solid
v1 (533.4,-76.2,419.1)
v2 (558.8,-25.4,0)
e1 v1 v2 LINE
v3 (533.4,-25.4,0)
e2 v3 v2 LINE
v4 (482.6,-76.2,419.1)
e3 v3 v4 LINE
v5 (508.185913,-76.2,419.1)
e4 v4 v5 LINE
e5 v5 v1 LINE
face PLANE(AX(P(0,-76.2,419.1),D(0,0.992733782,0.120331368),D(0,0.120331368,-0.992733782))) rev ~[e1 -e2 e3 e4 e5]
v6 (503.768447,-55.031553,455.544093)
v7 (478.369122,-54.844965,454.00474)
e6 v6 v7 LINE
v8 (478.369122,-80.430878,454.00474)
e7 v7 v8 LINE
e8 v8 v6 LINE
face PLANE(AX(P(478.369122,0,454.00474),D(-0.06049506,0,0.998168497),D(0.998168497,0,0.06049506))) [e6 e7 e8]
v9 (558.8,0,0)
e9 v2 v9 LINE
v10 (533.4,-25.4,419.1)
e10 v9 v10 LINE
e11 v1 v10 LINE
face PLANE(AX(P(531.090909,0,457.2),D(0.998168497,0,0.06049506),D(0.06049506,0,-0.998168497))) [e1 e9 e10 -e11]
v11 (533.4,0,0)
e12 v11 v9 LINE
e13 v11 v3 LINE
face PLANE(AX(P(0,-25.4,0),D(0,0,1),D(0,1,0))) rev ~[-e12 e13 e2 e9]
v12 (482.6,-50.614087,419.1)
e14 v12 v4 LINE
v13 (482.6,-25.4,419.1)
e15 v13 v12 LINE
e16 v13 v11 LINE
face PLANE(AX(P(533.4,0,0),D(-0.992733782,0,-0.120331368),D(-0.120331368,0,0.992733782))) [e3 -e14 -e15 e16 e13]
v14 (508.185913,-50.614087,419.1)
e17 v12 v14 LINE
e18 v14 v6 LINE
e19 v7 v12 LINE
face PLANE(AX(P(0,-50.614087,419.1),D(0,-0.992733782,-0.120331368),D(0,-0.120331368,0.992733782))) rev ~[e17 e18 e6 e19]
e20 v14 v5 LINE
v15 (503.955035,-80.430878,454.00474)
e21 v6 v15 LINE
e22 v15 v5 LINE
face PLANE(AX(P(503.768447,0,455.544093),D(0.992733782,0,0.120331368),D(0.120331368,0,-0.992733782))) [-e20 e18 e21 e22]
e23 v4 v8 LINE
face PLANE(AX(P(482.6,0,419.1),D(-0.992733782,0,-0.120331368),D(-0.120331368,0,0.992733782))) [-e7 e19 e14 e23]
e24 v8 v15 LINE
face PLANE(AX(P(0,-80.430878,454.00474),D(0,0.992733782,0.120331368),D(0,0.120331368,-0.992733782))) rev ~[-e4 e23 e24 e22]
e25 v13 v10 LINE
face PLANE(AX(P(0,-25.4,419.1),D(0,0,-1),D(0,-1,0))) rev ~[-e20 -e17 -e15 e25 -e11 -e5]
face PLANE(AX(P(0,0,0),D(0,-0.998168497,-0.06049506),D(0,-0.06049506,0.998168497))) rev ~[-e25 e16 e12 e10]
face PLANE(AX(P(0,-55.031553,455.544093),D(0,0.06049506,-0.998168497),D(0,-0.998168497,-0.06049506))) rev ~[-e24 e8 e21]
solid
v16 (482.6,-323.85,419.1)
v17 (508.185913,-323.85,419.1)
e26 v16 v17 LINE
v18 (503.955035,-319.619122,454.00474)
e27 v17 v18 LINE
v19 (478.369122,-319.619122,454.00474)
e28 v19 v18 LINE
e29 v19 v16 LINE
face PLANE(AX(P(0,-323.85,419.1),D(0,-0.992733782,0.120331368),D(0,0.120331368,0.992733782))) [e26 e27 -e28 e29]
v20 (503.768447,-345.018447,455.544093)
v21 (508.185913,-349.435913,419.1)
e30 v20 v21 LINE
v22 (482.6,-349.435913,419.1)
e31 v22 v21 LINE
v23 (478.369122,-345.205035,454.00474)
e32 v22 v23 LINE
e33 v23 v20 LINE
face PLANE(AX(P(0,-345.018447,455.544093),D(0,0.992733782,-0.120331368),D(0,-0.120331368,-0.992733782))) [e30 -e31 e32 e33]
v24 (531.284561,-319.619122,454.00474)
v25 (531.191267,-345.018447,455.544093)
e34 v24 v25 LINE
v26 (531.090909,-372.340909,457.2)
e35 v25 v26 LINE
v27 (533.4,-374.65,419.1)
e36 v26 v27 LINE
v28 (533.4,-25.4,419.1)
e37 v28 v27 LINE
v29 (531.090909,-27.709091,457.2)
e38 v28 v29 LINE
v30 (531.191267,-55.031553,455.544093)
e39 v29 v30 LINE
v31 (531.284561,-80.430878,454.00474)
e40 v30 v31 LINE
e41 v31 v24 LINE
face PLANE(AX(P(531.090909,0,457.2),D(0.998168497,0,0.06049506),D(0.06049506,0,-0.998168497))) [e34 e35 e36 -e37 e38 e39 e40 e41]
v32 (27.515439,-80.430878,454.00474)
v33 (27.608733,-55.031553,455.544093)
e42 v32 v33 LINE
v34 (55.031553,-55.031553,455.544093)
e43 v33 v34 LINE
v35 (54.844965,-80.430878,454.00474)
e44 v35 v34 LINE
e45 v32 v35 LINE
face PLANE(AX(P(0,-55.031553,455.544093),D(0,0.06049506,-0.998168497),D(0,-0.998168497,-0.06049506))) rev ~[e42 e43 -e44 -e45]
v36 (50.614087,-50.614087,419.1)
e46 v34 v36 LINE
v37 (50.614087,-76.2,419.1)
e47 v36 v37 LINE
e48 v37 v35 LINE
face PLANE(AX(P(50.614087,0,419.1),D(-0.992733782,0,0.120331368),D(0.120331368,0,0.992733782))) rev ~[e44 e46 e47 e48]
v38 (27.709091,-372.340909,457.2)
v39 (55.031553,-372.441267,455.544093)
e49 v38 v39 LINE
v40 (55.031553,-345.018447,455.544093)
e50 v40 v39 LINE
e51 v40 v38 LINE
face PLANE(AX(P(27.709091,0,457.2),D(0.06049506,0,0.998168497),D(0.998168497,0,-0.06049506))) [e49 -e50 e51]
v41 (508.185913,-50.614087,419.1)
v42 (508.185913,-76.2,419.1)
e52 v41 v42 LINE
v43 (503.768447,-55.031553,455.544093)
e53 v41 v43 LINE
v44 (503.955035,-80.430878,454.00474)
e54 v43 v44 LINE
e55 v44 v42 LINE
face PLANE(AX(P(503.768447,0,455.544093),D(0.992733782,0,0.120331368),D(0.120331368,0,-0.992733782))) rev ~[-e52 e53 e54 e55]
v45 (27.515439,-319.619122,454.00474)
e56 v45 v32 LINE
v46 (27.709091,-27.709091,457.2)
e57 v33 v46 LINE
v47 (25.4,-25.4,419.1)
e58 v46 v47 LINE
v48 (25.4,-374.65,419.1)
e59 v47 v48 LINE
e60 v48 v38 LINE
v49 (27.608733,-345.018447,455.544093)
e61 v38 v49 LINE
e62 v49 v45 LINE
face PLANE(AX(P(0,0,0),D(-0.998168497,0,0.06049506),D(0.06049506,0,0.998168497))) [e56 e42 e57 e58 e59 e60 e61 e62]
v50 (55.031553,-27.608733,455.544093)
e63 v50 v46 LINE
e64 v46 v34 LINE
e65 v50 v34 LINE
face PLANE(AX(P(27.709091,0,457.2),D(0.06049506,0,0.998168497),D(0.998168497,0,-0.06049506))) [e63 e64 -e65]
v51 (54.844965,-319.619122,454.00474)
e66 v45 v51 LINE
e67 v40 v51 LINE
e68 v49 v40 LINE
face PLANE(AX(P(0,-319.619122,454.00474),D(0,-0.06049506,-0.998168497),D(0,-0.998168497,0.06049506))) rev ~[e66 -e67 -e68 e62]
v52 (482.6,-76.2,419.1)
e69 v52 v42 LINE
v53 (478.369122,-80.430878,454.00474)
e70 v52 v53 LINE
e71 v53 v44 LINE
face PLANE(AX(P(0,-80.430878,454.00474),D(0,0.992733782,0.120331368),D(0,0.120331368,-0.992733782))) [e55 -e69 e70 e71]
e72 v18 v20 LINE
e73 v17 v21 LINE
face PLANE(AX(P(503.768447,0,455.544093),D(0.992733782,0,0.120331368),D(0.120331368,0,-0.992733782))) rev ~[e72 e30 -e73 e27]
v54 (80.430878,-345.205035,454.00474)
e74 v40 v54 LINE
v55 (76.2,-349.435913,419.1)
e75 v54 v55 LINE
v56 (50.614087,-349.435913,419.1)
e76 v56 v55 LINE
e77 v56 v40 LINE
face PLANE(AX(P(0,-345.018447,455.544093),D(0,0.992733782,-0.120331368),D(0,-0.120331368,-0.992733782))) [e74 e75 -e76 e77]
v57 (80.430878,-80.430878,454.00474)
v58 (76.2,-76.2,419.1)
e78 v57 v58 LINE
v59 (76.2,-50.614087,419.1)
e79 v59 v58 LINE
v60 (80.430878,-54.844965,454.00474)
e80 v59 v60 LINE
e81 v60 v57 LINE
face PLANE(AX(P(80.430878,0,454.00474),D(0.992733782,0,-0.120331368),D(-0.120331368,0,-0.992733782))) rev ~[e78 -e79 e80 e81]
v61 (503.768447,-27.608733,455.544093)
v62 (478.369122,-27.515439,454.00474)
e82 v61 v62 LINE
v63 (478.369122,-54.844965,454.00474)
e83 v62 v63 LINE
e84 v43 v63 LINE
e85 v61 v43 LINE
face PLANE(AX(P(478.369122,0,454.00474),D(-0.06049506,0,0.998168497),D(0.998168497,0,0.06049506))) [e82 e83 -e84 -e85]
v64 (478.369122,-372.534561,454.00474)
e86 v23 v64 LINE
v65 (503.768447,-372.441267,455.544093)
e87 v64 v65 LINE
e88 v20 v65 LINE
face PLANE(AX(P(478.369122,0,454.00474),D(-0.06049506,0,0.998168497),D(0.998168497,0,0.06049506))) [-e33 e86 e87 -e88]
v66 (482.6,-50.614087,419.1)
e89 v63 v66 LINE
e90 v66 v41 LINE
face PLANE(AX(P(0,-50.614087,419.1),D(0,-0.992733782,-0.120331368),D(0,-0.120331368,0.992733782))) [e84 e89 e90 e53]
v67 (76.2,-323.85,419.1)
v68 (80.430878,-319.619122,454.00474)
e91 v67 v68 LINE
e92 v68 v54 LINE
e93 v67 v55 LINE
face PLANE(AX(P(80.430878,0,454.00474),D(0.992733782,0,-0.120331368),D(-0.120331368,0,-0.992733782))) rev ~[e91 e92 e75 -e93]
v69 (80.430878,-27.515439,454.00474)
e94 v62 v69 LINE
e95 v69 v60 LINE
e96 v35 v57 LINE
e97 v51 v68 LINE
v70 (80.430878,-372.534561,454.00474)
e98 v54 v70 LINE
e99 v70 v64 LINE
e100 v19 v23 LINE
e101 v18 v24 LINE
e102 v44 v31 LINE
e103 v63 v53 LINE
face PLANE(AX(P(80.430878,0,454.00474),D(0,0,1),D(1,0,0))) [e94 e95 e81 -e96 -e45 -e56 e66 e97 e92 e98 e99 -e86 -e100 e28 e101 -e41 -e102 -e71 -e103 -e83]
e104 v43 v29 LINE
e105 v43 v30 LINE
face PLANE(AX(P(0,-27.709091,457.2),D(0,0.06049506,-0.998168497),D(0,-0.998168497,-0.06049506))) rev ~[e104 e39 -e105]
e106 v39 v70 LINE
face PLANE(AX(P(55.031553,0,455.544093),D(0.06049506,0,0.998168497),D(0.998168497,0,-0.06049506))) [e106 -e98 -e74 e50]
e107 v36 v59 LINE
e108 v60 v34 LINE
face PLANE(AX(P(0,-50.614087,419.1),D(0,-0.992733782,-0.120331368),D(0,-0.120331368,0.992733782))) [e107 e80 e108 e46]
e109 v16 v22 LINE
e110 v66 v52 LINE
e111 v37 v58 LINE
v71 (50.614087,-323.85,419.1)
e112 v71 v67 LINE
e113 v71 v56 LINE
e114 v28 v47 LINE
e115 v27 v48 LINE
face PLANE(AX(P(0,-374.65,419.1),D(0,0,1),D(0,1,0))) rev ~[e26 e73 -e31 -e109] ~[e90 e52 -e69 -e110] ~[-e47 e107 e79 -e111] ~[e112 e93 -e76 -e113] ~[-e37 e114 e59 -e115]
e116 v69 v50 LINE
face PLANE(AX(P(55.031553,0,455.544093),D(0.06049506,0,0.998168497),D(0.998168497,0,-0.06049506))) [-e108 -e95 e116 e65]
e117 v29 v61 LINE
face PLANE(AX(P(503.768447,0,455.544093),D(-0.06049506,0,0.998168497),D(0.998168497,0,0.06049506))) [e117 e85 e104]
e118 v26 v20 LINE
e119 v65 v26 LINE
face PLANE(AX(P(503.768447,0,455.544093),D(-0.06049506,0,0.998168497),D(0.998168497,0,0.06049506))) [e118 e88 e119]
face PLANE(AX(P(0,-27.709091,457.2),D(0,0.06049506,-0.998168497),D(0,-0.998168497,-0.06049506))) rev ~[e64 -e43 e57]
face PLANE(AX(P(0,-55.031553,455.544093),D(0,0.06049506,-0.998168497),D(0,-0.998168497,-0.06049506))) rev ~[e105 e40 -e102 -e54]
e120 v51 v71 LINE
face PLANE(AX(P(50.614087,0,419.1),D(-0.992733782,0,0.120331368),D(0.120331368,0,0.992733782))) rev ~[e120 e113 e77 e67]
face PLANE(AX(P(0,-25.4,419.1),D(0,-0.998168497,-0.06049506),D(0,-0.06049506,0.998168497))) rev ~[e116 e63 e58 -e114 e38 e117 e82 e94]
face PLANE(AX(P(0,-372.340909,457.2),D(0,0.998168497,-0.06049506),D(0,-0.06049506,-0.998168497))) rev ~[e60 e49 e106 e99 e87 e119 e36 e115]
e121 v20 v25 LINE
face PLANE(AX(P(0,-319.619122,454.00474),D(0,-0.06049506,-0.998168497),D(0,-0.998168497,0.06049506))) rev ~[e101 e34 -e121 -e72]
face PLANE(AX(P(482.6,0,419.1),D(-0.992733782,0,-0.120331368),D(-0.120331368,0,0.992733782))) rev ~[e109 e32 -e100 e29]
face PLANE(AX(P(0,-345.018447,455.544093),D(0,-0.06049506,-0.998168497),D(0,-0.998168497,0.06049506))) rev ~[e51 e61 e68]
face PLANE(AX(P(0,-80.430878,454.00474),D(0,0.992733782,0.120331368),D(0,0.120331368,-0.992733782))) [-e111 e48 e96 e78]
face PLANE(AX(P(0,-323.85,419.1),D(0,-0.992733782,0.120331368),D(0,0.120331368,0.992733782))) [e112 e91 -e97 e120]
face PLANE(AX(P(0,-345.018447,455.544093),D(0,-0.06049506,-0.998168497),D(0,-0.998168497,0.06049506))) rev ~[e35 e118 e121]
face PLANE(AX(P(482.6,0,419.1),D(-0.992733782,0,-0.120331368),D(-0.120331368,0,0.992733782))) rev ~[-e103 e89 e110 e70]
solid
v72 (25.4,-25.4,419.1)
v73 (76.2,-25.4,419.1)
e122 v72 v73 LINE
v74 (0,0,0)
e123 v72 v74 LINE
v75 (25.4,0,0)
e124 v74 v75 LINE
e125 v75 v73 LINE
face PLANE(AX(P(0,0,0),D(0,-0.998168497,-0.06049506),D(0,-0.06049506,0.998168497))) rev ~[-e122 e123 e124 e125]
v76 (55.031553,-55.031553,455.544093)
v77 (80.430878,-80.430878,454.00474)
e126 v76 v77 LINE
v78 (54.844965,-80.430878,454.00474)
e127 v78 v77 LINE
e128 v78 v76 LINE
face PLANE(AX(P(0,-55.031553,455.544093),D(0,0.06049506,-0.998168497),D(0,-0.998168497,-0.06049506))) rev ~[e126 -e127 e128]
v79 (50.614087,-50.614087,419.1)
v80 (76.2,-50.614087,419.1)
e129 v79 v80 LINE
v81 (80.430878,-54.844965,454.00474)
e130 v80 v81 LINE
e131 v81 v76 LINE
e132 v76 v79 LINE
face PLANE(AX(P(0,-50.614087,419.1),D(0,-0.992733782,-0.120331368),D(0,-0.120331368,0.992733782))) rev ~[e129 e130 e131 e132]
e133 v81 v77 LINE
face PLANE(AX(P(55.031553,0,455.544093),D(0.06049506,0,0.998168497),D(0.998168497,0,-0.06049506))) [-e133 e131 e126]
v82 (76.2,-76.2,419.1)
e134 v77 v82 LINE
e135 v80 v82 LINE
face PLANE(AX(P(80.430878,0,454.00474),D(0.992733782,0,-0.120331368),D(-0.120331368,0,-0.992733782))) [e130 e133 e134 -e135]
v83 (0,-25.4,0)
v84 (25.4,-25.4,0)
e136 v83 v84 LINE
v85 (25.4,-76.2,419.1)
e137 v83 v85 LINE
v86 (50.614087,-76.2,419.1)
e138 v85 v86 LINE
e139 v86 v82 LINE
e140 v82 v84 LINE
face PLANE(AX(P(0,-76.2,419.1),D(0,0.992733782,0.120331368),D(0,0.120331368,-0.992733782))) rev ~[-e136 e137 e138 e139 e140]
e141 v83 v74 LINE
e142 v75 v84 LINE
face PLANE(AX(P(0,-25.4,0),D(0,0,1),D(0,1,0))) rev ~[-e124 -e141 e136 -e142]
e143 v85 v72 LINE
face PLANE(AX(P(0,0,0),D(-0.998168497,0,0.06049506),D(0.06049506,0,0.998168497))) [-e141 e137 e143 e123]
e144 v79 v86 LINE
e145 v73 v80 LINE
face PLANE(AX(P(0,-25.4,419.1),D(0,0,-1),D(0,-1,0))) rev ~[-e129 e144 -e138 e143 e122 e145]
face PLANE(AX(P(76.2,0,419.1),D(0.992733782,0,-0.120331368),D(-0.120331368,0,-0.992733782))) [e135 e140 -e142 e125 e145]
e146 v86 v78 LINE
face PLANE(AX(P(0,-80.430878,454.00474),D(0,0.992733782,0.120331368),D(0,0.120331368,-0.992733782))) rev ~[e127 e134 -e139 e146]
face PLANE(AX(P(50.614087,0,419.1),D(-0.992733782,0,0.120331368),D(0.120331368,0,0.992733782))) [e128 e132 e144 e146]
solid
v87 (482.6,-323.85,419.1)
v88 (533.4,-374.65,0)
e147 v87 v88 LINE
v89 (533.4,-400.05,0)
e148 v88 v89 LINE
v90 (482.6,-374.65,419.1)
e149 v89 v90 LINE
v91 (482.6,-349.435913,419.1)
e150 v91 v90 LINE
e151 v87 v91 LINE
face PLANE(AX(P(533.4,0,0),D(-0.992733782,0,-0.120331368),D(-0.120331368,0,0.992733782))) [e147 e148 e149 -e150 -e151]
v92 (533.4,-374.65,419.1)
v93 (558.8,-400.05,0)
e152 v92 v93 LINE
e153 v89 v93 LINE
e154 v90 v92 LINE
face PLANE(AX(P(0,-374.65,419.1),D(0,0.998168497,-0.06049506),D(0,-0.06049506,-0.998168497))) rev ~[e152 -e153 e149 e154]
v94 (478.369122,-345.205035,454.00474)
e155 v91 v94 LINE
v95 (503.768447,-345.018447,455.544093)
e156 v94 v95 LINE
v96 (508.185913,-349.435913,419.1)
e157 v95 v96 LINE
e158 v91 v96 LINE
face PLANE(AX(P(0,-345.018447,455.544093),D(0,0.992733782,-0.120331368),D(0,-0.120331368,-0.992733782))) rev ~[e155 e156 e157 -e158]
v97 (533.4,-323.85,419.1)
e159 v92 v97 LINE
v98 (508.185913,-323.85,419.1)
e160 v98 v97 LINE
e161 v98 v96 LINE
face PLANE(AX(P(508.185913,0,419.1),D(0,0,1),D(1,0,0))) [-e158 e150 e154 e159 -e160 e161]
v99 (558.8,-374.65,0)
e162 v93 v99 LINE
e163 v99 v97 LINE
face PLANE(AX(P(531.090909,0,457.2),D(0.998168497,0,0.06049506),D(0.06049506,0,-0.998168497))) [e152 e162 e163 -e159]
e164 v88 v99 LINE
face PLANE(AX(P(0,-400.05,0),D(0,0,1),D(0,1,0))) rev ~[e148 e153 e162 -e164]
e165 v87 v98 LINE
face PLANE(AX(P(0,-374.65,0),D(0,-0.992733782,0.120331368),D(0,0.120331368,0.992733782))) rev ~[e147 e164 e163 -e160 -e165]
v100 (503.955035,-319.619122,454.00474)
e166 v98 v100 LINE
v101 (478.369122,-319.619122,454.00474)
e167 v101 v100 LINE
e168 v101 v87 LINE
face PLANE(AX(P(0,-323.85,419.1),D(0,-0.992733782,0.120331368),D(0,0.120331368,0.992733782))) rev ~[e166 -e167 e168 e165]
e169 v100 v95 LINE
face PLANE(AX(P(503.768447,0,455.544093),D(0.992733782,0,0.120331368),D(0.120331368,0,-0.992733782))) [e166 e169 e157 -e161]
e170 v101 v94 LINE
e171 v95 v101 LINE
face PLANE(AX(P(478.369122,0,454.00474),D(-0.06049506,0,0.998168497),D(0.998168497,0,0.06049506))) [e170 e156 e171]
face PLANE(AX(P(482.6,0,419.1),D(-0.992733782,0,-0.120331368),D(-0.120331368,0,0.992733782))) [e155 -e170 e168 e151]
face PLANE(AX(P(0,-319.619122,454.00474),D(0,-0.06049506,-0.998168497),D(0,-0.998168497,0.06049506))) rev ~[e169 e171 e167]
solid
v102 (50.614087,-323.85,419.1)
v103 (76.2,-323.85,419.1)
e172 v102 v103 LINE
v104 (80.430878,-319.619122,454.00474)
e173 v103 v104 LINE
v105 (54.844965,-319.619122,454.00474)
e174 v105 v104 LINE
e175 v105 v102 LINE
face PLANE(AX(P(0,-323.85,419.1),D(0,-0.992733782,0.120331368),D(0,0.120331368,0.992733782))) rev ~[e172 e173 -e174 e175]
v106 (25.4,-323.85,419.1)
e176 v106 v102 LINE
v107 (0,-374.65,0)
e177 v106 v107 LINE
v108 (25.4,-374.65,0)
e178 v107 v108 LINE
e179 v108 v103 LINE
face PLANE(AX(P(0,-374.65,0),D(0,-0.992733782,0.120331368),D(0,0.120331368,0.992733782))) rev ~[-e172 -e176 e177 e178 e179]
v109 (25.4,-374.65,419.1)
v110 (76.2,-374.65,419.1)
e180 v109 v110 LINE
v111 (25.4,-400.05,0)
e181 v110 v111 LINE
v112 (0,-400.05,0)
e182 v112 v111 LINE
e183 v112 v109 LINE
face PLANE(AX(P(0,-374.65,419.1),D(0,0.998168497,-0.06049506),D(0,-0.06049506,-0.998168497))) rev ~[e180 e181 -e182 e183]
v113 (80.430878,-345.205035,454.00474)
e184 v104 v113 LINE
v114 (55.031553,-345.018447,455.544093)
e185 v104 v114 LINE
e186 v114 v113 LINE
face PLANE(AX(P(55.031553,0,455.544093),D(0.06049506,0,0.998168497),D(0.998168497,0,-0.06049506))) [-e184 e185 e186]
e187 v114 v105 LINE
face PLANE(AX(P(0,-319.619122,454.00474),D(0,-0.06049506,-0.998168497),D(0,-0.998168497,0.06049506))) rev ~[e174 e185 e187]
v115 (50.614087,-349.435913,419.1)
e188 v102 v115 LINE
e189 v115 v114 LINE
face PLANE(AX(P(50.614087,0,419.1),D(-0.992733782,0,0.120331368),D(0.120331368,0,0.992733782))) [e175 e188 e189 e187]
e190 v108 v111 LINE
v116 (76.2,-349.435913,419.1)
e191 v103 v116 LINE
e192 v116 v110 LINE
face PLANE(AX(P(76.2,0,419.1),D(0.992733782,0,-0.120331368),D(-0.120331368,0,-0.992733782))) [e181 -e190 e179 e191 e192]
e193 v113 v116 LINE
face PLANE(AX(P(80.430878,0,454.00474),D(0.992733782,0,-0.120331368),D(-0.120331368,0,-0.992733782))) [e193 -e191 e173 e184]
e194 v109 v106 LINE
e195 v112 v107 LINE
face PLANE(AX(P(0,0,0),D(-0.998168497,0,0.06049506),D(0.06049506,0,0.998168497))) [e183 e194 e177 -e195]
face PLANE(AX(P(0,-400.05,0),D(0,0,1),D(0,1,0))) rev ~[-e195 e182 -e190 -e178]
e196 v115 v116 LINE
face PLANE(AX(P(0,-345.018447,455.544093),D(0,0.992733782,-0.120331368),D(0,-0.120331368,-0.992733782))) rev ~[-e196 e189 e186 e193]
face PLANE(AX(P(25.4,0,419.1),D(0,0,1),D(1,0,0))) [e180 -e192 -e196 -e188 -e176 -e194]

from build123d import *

# Parameters (mm, degrees)
F1_DEPTH = 558.8
F2_DEPTH = 558.8
F4_DEPTH = 400.051
F5_DEPTH = 400.051


with BuildPart() as f1:
    # F0 (on Right) → F1 (new body)
    with BuildSketch(Plane.YZ):
        Polygon((-50.6140871806, 419.1), (-25.4, 419.1), (-27.7090909091, 457.2), (-55.0315530236, 455.5440932052), align=None)
        Polygon((-76.2, 419.1), (-50.6140871806, 419.1), (-55.0315530236, 455.5440932052), (-80.4308776001, 454.0047402005), align=None)
        Polygon((-323.85, 419.1), (-76.2, 419.1), (-80.4308776001, 454.0047402005), (-319.6191223999, 454.0047402005), align=None)
        Polygon((-349.4359128194, 419.1), (-323.85, 419.1), (-319.6191223999, 454.0047402005), (-345.0184469764, 455.5440932052), align=None)
        Polygon((-374.65, 419.1), (-349.4359128194, 419.1), (-345.0184469764, 455.5440932052), (-372.3409090909, 457.2), align=None)
    extrude(amount=F1_DEPTH)


with BuildPart() as f2:
    # F0 (on Right) → F2 (new body, through all)
    with BuildSketch(Plane.YZ):
        Polygon((-25.4, 0), (0, 0), (-25.4, 419.1), (-50.6140871806, 419.1), (-76.2, 419.1), align=None)
        Polygon((-76.2, 419.1), (-50.6140871806, 419.1), (-55.0315530236, 455.5440932052), (-80.4308776001, 454.0047402005), align=None)
    extrude(amount=F2_DEPTH)


with BuildPart() as f2b:
    # F0 (on Right) → F2, piece 2 (new body, through all)
    with BuildSketch(Plane.YZ):
        Polygon((-374.65, 0), (-323.85, 419.1), (-349.4359128194, 419.1), (-374.65, 419.1), (-400.05, 0), align=None)
        Polygon((-349.4359128194, 419.1), (-323.85, 419.1), (-319.6191223999, 454.0047402005), (-345.0184469764, 455.5440932052), align=None)
    extrude(amount=F2_DEPTH)


with BuildPart() as f4_tool:
    # F3 (on Front) → F4 (new body, through all)
    with BuildSketch(Plane.XZ):
        Polygon((25.4, 0), (533.4, 0), (482.6, 419.1), (76.2, 419.1), align=None)
        Polygon((503.7684469764, 455.5440932052), (531.0909090909, 457.2), (27.7090909091, 457.2), (55.0315530236, 455.5440932052), (80.4308776001, 454.0047402005), (478.3691223999, 454.0047402005), align=None)
        Polygon((533.4, 419.1), (558.8, 0), (558.8, 457.2), (531.0909090909, 457.2), align=None)
        Polygon((25.4, 419.1), (27.7090909091, 457.2), (0, 457.2), (0, 0), align=None)
    extrude(amount=F4_DEPTH)


with BuildPart() as f1_1:
    add(f1.part)

    # F4: cut by f4_tool
    add(f4_tool.part, mode=Mode.SUBTRACT)


with BuildPart() as f2_1:
    add(f2.part)

    # F4: cut by f4_tool
    add(f4_tool.part, mode=Mode.SUBTRACT)


with BuildPart() as f2b_1:
    add(f2b.part)

    # F4: cut by f4_tool
    add(f4_tool.part, mode=Mode.SUBTRACT)


with BuildPart() as f5_tool:
    # F3 (on Front) → F5 (new body, through all)
    with BuildSketch(Plane.XZ):
        Polygon((508.1859128194, 419.1), (533.4, 419.1), (531.0909090909, 457.2), (503.7684469764, 455.5440932052), align=None)
        Polygon((55.0315530236, 455.5440932052), (27.7090909091, 457.2), (25.4, 419.1), (50.6140871806, 419.1), align=None)
        Polygon((76.2, 419.1), (482.6, 419.1), (478.3691223999, 454.0047402005), (80.4308776001, 454.0047402005), align=None)
    extrude(amount=F5_DEPTH)


with BuildPart() as f2_2:
    add(f2_1.part)

    # F5: cut by f5_tool
    add(f5_tool.part, mode=Mode.SUBTRACT)


with BuildPart() as f2b_2:
    add(f2b_1.part)

    # F5: cut by f5_tool
    add(f5_tool.part, mode=Mode.SUBTRACT)


with BuildPart() as f1_2:
    add(f1_1.part)

    # F6: cut F2b, F2
    add(f2b_2.part, mode=Mode.SUBTRACT)
    add(f2_2.part, mode=Mode.SUBTRACT)


solid = Compound([f2_2.part, f2b_2.part, f1_2.part])
